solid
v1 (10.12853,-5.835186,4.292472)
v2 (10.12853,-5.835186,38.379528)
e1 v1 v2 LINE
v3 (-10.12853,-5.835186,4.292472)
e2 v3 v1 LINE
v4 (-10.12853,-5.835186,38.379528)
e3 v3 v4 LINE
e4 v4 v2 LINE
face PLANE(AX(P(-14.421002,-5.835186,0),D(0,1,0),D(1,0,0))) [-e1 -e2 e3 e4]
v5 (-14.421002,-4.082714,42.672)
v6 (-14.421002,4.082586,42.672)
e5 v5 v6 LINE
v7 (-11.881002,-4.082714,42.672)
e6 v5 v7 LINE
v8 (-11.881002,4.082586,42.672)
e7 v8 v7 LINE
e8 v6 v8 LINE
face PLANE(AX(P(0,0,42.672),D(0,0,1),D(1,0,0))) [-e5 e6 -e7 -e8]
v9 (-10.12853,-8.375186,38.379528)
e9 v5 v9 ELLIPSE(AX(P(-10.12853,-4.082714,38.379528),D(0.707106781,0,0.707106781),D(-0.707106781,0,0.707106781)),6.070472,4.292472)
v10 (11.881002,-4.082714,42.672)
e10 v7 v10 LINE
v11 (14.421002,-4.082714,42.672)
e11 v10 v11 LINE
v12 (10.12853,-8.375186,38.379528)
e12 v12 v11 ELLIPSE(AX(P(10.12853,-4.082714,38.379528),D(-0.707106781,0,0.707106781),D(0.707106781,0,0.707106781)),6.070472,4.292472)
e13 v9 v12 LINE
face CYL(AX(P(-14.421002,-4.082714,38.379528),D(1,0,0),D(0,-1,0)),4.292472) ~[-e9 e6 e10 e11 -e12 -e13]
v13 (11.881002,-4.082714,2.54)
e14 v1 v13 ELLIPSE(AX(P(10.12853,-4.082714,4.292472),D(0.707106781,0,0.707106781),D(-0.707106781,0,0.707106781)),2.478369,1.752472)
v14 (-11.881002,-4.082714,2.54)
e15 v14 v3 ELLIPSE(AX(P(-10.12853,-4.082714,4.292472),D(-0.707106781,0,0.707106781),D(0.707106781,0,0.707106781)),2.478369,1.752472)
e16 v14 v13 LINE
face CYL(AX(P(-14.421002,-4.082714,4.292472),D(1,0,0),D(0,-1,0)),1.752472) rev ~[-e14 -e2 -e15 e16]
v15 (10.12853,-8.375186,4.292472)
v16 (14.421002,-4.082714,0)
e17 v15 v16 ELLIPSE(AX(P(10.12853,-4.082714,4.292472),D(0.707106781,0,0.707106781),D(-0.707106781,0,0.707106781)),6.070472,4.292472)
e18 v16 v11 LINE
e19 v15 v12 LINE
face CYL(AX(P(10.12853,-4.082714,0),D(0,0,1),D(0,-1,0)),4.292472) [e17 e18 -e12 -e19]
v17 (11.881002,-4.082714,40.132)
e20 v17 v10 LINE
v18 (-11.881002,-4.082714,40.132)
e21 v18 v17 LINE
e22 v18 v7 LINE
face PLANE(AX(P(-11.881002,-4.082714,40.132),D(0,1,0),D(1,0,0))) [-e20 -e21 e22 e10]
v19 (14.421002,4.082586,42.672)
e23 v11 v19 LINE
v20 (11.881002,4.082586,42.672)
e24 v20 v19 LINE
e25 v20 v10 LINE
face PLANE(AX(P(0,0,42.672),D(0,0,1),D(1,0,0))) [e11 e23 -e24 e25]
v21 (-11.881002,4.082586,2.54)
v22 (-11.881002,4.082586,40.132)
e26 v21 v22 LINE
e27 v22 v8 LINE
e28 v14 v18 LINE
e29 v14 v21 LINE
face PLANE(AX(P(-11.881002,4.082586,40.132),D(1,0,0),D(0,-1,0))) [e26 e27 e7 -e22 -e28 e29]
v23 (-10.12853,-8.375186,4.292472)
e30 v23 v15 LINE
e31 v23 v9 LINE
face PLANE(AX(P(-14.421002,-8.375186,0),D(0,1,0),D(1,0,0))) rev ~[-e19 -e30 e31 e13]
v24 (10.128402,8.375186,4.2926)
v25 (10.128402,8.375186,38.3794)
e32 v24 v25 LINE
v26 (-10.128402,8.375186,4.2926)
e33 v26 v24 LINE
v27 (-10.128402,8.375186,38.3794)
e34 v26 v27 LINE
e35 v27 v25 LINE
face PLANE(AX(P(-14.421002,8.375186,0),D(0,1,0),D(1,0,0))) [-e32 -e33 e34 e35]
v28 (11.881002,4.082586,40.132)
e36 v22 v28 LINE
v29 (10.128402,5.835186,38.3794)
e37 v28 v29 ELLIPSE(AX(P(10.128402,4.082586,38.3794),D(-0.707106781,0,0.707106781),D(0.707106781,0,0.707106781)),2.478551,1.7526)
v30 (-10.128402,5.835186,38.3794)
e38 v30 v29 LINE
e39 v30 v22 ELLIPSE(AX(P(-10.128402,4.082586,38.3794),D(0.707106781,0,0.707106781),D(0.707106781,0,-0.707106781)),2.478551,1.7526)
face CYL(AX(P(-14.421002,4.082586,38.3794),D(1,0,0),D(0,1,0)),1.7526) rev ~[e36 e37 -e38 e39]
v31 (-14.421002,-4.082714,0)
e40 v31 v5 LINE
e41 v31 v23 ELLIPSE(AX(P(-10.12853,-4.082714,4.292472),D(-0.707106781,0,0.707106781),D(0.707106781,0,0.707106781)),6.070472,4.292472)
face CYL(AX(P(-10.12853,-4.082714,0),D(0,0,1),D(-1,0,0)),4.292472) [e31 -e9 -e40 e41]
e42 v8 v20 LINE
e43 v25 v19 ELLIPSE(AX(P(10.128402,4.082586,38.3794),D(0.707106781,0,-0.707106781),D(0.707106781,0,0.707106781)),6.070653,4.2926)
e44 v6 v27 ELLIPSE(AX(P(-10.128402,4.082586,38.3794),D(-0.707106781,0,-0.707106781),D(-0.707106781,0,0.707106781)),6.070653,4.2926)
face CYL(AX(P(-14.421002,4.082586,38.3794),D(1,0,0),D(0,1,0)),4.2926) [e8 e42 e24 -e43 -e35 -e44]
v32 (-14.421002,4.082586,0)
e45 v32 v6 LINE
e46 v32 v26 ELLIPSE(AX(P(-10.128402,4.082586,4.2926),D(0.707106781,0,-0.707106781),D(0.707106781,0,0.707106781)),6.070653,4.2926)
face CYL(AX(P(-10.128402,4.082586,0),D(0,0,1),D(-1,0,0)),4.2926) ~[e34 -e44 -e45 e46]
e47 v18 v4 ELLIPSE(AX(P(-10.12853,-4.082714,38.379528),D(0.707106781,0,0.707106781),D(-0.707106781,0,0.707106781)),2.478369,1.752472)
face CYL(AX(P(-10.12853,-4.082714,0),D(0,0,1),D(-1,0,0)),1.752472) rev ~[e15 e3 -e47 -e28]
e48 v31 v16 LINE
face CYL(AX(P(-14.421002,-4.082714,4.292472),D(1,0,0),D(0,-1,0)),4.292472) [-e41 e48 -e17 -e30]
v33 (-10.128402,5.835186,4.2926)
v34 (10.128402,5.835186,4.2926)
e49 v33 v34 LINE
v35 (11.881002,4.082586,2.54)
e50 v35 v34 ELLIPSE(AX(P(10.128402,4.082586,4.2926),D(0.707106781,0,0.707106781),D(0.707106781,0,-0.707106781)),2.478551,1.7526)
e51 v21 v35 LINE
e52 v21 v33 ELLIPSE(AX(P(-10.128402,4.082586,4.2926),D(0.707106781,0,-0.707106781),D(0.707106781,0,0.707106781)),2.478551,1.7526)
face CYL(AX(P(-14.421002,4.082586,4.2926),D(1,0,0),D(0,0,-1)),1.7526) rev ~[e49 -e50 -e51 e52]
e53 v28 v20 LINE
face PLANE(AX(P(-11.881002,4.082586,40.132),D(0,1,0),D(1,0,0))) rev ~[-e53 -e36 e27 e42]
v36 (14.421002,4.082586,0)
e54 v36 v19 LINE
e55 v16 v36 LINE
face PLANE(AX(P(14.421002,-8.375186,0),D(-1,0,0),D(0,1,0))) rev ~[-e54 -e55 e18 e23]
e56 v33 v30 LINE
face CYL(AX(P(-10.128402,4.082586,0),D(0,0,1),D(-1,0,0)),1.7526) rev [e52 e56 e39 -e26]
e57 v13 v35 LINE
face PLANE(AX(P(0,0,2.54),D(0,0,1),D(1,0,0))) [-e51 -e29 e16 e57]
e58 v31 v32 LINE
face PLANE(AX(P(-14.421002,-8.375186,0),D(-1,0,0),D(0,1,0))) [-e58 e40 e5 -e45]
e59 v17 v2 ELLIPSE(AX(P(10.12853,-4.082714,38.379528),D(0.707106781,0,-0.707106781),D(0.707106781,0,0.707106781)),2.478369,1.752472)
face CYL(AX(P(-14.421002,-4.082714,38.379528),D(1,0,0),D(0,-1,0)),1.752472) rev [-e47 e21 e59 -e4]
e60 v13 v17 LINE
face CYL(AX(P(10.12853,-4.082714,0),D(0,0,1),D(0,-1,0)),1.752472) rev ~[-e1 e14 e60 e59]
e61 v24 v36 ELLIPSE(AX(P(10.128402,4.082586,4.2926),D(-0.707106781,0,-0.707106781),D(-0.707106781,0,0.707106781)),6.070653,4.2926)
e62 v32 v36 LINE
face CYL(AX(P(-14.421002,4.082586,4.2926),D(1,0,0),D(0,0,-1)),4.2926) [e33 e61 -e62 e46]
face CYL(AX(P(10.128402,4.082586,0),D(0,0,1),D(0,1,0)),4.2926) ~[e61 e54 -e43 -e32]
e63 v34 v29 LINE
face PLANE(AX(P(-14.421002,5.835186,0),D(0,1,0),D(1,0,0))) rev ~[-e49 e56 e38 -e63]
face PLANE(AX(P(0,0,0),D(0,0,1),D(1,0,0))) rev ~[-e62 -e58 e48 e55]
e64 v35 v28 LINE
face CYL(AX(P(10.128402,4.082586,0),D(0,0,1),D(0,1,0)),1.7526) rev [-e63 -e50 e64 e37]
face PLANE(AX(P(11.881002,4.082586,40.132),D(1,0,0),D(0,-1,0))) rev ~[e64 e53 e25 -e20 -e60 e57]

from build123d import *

# Parameters (mm, degrees)
F0_W     = 28.842004016
F0_H     = 16.7503710836
F1_DEPTH = 42.672
F2_R     = 4.2924717139
F3_R     = 4.2926
F4_T     = -2.54


# Not quite as in the source:
# - a shell that OpenCascade refuses in one call is made with other operations: the cavity is built on its own and cut out


with BuildPart() as f1:
    # F0 (on Top) → F1 (new body)
    with BuildSketch(Plane.XY):
        Rectangle(F0_W, F0_H)
    extrude(amount=F1_DEPTH)

    # F2
    f2_edges = [f1.edges().sort_by_distance(p)[0] for p in [
        (-14.421002, -8.375186, 21.336),
        (14.421002, -8.375186, 21.336),
        (0, -8.375186, 0),
        (0, -8.375186, 42.672),
    ]]
    fillet(f2_edges, radius=F2_R)

    # F3
    f3_edges = [f1.edges().sort_by_distance(p)[0] for p in [
        (14.421002, 8.375186, 21.336),
        (-14.421002, 8.375186, 21.336),
        (0, 8.375186, 0),
        (0, 8.375186, 42.672),
    ]]
    fillet(f3_edges, radius=F3_R)

    # F4: a shell. OpenCascade refuses it in one call, so the cavity is built on its own and cut out:
    # the body offset inwards by the wall thickness, plus a prism from it out through each open face.
    f4_core = offset(f1.part, amount=F4_T, mode=Mode.PRIVATE)
    f4_exits = [f4_core.faces().sort_by_distance(p)[0] for p in [
        (0, -6.4e-05, 40.132),
    ]]
    add(f4_core, mode=Mode.SUBTRACT)
    extrude(f4_exits, amount=-F4_T, mode=Mode.SUBTRACT)


solid = f1.part
